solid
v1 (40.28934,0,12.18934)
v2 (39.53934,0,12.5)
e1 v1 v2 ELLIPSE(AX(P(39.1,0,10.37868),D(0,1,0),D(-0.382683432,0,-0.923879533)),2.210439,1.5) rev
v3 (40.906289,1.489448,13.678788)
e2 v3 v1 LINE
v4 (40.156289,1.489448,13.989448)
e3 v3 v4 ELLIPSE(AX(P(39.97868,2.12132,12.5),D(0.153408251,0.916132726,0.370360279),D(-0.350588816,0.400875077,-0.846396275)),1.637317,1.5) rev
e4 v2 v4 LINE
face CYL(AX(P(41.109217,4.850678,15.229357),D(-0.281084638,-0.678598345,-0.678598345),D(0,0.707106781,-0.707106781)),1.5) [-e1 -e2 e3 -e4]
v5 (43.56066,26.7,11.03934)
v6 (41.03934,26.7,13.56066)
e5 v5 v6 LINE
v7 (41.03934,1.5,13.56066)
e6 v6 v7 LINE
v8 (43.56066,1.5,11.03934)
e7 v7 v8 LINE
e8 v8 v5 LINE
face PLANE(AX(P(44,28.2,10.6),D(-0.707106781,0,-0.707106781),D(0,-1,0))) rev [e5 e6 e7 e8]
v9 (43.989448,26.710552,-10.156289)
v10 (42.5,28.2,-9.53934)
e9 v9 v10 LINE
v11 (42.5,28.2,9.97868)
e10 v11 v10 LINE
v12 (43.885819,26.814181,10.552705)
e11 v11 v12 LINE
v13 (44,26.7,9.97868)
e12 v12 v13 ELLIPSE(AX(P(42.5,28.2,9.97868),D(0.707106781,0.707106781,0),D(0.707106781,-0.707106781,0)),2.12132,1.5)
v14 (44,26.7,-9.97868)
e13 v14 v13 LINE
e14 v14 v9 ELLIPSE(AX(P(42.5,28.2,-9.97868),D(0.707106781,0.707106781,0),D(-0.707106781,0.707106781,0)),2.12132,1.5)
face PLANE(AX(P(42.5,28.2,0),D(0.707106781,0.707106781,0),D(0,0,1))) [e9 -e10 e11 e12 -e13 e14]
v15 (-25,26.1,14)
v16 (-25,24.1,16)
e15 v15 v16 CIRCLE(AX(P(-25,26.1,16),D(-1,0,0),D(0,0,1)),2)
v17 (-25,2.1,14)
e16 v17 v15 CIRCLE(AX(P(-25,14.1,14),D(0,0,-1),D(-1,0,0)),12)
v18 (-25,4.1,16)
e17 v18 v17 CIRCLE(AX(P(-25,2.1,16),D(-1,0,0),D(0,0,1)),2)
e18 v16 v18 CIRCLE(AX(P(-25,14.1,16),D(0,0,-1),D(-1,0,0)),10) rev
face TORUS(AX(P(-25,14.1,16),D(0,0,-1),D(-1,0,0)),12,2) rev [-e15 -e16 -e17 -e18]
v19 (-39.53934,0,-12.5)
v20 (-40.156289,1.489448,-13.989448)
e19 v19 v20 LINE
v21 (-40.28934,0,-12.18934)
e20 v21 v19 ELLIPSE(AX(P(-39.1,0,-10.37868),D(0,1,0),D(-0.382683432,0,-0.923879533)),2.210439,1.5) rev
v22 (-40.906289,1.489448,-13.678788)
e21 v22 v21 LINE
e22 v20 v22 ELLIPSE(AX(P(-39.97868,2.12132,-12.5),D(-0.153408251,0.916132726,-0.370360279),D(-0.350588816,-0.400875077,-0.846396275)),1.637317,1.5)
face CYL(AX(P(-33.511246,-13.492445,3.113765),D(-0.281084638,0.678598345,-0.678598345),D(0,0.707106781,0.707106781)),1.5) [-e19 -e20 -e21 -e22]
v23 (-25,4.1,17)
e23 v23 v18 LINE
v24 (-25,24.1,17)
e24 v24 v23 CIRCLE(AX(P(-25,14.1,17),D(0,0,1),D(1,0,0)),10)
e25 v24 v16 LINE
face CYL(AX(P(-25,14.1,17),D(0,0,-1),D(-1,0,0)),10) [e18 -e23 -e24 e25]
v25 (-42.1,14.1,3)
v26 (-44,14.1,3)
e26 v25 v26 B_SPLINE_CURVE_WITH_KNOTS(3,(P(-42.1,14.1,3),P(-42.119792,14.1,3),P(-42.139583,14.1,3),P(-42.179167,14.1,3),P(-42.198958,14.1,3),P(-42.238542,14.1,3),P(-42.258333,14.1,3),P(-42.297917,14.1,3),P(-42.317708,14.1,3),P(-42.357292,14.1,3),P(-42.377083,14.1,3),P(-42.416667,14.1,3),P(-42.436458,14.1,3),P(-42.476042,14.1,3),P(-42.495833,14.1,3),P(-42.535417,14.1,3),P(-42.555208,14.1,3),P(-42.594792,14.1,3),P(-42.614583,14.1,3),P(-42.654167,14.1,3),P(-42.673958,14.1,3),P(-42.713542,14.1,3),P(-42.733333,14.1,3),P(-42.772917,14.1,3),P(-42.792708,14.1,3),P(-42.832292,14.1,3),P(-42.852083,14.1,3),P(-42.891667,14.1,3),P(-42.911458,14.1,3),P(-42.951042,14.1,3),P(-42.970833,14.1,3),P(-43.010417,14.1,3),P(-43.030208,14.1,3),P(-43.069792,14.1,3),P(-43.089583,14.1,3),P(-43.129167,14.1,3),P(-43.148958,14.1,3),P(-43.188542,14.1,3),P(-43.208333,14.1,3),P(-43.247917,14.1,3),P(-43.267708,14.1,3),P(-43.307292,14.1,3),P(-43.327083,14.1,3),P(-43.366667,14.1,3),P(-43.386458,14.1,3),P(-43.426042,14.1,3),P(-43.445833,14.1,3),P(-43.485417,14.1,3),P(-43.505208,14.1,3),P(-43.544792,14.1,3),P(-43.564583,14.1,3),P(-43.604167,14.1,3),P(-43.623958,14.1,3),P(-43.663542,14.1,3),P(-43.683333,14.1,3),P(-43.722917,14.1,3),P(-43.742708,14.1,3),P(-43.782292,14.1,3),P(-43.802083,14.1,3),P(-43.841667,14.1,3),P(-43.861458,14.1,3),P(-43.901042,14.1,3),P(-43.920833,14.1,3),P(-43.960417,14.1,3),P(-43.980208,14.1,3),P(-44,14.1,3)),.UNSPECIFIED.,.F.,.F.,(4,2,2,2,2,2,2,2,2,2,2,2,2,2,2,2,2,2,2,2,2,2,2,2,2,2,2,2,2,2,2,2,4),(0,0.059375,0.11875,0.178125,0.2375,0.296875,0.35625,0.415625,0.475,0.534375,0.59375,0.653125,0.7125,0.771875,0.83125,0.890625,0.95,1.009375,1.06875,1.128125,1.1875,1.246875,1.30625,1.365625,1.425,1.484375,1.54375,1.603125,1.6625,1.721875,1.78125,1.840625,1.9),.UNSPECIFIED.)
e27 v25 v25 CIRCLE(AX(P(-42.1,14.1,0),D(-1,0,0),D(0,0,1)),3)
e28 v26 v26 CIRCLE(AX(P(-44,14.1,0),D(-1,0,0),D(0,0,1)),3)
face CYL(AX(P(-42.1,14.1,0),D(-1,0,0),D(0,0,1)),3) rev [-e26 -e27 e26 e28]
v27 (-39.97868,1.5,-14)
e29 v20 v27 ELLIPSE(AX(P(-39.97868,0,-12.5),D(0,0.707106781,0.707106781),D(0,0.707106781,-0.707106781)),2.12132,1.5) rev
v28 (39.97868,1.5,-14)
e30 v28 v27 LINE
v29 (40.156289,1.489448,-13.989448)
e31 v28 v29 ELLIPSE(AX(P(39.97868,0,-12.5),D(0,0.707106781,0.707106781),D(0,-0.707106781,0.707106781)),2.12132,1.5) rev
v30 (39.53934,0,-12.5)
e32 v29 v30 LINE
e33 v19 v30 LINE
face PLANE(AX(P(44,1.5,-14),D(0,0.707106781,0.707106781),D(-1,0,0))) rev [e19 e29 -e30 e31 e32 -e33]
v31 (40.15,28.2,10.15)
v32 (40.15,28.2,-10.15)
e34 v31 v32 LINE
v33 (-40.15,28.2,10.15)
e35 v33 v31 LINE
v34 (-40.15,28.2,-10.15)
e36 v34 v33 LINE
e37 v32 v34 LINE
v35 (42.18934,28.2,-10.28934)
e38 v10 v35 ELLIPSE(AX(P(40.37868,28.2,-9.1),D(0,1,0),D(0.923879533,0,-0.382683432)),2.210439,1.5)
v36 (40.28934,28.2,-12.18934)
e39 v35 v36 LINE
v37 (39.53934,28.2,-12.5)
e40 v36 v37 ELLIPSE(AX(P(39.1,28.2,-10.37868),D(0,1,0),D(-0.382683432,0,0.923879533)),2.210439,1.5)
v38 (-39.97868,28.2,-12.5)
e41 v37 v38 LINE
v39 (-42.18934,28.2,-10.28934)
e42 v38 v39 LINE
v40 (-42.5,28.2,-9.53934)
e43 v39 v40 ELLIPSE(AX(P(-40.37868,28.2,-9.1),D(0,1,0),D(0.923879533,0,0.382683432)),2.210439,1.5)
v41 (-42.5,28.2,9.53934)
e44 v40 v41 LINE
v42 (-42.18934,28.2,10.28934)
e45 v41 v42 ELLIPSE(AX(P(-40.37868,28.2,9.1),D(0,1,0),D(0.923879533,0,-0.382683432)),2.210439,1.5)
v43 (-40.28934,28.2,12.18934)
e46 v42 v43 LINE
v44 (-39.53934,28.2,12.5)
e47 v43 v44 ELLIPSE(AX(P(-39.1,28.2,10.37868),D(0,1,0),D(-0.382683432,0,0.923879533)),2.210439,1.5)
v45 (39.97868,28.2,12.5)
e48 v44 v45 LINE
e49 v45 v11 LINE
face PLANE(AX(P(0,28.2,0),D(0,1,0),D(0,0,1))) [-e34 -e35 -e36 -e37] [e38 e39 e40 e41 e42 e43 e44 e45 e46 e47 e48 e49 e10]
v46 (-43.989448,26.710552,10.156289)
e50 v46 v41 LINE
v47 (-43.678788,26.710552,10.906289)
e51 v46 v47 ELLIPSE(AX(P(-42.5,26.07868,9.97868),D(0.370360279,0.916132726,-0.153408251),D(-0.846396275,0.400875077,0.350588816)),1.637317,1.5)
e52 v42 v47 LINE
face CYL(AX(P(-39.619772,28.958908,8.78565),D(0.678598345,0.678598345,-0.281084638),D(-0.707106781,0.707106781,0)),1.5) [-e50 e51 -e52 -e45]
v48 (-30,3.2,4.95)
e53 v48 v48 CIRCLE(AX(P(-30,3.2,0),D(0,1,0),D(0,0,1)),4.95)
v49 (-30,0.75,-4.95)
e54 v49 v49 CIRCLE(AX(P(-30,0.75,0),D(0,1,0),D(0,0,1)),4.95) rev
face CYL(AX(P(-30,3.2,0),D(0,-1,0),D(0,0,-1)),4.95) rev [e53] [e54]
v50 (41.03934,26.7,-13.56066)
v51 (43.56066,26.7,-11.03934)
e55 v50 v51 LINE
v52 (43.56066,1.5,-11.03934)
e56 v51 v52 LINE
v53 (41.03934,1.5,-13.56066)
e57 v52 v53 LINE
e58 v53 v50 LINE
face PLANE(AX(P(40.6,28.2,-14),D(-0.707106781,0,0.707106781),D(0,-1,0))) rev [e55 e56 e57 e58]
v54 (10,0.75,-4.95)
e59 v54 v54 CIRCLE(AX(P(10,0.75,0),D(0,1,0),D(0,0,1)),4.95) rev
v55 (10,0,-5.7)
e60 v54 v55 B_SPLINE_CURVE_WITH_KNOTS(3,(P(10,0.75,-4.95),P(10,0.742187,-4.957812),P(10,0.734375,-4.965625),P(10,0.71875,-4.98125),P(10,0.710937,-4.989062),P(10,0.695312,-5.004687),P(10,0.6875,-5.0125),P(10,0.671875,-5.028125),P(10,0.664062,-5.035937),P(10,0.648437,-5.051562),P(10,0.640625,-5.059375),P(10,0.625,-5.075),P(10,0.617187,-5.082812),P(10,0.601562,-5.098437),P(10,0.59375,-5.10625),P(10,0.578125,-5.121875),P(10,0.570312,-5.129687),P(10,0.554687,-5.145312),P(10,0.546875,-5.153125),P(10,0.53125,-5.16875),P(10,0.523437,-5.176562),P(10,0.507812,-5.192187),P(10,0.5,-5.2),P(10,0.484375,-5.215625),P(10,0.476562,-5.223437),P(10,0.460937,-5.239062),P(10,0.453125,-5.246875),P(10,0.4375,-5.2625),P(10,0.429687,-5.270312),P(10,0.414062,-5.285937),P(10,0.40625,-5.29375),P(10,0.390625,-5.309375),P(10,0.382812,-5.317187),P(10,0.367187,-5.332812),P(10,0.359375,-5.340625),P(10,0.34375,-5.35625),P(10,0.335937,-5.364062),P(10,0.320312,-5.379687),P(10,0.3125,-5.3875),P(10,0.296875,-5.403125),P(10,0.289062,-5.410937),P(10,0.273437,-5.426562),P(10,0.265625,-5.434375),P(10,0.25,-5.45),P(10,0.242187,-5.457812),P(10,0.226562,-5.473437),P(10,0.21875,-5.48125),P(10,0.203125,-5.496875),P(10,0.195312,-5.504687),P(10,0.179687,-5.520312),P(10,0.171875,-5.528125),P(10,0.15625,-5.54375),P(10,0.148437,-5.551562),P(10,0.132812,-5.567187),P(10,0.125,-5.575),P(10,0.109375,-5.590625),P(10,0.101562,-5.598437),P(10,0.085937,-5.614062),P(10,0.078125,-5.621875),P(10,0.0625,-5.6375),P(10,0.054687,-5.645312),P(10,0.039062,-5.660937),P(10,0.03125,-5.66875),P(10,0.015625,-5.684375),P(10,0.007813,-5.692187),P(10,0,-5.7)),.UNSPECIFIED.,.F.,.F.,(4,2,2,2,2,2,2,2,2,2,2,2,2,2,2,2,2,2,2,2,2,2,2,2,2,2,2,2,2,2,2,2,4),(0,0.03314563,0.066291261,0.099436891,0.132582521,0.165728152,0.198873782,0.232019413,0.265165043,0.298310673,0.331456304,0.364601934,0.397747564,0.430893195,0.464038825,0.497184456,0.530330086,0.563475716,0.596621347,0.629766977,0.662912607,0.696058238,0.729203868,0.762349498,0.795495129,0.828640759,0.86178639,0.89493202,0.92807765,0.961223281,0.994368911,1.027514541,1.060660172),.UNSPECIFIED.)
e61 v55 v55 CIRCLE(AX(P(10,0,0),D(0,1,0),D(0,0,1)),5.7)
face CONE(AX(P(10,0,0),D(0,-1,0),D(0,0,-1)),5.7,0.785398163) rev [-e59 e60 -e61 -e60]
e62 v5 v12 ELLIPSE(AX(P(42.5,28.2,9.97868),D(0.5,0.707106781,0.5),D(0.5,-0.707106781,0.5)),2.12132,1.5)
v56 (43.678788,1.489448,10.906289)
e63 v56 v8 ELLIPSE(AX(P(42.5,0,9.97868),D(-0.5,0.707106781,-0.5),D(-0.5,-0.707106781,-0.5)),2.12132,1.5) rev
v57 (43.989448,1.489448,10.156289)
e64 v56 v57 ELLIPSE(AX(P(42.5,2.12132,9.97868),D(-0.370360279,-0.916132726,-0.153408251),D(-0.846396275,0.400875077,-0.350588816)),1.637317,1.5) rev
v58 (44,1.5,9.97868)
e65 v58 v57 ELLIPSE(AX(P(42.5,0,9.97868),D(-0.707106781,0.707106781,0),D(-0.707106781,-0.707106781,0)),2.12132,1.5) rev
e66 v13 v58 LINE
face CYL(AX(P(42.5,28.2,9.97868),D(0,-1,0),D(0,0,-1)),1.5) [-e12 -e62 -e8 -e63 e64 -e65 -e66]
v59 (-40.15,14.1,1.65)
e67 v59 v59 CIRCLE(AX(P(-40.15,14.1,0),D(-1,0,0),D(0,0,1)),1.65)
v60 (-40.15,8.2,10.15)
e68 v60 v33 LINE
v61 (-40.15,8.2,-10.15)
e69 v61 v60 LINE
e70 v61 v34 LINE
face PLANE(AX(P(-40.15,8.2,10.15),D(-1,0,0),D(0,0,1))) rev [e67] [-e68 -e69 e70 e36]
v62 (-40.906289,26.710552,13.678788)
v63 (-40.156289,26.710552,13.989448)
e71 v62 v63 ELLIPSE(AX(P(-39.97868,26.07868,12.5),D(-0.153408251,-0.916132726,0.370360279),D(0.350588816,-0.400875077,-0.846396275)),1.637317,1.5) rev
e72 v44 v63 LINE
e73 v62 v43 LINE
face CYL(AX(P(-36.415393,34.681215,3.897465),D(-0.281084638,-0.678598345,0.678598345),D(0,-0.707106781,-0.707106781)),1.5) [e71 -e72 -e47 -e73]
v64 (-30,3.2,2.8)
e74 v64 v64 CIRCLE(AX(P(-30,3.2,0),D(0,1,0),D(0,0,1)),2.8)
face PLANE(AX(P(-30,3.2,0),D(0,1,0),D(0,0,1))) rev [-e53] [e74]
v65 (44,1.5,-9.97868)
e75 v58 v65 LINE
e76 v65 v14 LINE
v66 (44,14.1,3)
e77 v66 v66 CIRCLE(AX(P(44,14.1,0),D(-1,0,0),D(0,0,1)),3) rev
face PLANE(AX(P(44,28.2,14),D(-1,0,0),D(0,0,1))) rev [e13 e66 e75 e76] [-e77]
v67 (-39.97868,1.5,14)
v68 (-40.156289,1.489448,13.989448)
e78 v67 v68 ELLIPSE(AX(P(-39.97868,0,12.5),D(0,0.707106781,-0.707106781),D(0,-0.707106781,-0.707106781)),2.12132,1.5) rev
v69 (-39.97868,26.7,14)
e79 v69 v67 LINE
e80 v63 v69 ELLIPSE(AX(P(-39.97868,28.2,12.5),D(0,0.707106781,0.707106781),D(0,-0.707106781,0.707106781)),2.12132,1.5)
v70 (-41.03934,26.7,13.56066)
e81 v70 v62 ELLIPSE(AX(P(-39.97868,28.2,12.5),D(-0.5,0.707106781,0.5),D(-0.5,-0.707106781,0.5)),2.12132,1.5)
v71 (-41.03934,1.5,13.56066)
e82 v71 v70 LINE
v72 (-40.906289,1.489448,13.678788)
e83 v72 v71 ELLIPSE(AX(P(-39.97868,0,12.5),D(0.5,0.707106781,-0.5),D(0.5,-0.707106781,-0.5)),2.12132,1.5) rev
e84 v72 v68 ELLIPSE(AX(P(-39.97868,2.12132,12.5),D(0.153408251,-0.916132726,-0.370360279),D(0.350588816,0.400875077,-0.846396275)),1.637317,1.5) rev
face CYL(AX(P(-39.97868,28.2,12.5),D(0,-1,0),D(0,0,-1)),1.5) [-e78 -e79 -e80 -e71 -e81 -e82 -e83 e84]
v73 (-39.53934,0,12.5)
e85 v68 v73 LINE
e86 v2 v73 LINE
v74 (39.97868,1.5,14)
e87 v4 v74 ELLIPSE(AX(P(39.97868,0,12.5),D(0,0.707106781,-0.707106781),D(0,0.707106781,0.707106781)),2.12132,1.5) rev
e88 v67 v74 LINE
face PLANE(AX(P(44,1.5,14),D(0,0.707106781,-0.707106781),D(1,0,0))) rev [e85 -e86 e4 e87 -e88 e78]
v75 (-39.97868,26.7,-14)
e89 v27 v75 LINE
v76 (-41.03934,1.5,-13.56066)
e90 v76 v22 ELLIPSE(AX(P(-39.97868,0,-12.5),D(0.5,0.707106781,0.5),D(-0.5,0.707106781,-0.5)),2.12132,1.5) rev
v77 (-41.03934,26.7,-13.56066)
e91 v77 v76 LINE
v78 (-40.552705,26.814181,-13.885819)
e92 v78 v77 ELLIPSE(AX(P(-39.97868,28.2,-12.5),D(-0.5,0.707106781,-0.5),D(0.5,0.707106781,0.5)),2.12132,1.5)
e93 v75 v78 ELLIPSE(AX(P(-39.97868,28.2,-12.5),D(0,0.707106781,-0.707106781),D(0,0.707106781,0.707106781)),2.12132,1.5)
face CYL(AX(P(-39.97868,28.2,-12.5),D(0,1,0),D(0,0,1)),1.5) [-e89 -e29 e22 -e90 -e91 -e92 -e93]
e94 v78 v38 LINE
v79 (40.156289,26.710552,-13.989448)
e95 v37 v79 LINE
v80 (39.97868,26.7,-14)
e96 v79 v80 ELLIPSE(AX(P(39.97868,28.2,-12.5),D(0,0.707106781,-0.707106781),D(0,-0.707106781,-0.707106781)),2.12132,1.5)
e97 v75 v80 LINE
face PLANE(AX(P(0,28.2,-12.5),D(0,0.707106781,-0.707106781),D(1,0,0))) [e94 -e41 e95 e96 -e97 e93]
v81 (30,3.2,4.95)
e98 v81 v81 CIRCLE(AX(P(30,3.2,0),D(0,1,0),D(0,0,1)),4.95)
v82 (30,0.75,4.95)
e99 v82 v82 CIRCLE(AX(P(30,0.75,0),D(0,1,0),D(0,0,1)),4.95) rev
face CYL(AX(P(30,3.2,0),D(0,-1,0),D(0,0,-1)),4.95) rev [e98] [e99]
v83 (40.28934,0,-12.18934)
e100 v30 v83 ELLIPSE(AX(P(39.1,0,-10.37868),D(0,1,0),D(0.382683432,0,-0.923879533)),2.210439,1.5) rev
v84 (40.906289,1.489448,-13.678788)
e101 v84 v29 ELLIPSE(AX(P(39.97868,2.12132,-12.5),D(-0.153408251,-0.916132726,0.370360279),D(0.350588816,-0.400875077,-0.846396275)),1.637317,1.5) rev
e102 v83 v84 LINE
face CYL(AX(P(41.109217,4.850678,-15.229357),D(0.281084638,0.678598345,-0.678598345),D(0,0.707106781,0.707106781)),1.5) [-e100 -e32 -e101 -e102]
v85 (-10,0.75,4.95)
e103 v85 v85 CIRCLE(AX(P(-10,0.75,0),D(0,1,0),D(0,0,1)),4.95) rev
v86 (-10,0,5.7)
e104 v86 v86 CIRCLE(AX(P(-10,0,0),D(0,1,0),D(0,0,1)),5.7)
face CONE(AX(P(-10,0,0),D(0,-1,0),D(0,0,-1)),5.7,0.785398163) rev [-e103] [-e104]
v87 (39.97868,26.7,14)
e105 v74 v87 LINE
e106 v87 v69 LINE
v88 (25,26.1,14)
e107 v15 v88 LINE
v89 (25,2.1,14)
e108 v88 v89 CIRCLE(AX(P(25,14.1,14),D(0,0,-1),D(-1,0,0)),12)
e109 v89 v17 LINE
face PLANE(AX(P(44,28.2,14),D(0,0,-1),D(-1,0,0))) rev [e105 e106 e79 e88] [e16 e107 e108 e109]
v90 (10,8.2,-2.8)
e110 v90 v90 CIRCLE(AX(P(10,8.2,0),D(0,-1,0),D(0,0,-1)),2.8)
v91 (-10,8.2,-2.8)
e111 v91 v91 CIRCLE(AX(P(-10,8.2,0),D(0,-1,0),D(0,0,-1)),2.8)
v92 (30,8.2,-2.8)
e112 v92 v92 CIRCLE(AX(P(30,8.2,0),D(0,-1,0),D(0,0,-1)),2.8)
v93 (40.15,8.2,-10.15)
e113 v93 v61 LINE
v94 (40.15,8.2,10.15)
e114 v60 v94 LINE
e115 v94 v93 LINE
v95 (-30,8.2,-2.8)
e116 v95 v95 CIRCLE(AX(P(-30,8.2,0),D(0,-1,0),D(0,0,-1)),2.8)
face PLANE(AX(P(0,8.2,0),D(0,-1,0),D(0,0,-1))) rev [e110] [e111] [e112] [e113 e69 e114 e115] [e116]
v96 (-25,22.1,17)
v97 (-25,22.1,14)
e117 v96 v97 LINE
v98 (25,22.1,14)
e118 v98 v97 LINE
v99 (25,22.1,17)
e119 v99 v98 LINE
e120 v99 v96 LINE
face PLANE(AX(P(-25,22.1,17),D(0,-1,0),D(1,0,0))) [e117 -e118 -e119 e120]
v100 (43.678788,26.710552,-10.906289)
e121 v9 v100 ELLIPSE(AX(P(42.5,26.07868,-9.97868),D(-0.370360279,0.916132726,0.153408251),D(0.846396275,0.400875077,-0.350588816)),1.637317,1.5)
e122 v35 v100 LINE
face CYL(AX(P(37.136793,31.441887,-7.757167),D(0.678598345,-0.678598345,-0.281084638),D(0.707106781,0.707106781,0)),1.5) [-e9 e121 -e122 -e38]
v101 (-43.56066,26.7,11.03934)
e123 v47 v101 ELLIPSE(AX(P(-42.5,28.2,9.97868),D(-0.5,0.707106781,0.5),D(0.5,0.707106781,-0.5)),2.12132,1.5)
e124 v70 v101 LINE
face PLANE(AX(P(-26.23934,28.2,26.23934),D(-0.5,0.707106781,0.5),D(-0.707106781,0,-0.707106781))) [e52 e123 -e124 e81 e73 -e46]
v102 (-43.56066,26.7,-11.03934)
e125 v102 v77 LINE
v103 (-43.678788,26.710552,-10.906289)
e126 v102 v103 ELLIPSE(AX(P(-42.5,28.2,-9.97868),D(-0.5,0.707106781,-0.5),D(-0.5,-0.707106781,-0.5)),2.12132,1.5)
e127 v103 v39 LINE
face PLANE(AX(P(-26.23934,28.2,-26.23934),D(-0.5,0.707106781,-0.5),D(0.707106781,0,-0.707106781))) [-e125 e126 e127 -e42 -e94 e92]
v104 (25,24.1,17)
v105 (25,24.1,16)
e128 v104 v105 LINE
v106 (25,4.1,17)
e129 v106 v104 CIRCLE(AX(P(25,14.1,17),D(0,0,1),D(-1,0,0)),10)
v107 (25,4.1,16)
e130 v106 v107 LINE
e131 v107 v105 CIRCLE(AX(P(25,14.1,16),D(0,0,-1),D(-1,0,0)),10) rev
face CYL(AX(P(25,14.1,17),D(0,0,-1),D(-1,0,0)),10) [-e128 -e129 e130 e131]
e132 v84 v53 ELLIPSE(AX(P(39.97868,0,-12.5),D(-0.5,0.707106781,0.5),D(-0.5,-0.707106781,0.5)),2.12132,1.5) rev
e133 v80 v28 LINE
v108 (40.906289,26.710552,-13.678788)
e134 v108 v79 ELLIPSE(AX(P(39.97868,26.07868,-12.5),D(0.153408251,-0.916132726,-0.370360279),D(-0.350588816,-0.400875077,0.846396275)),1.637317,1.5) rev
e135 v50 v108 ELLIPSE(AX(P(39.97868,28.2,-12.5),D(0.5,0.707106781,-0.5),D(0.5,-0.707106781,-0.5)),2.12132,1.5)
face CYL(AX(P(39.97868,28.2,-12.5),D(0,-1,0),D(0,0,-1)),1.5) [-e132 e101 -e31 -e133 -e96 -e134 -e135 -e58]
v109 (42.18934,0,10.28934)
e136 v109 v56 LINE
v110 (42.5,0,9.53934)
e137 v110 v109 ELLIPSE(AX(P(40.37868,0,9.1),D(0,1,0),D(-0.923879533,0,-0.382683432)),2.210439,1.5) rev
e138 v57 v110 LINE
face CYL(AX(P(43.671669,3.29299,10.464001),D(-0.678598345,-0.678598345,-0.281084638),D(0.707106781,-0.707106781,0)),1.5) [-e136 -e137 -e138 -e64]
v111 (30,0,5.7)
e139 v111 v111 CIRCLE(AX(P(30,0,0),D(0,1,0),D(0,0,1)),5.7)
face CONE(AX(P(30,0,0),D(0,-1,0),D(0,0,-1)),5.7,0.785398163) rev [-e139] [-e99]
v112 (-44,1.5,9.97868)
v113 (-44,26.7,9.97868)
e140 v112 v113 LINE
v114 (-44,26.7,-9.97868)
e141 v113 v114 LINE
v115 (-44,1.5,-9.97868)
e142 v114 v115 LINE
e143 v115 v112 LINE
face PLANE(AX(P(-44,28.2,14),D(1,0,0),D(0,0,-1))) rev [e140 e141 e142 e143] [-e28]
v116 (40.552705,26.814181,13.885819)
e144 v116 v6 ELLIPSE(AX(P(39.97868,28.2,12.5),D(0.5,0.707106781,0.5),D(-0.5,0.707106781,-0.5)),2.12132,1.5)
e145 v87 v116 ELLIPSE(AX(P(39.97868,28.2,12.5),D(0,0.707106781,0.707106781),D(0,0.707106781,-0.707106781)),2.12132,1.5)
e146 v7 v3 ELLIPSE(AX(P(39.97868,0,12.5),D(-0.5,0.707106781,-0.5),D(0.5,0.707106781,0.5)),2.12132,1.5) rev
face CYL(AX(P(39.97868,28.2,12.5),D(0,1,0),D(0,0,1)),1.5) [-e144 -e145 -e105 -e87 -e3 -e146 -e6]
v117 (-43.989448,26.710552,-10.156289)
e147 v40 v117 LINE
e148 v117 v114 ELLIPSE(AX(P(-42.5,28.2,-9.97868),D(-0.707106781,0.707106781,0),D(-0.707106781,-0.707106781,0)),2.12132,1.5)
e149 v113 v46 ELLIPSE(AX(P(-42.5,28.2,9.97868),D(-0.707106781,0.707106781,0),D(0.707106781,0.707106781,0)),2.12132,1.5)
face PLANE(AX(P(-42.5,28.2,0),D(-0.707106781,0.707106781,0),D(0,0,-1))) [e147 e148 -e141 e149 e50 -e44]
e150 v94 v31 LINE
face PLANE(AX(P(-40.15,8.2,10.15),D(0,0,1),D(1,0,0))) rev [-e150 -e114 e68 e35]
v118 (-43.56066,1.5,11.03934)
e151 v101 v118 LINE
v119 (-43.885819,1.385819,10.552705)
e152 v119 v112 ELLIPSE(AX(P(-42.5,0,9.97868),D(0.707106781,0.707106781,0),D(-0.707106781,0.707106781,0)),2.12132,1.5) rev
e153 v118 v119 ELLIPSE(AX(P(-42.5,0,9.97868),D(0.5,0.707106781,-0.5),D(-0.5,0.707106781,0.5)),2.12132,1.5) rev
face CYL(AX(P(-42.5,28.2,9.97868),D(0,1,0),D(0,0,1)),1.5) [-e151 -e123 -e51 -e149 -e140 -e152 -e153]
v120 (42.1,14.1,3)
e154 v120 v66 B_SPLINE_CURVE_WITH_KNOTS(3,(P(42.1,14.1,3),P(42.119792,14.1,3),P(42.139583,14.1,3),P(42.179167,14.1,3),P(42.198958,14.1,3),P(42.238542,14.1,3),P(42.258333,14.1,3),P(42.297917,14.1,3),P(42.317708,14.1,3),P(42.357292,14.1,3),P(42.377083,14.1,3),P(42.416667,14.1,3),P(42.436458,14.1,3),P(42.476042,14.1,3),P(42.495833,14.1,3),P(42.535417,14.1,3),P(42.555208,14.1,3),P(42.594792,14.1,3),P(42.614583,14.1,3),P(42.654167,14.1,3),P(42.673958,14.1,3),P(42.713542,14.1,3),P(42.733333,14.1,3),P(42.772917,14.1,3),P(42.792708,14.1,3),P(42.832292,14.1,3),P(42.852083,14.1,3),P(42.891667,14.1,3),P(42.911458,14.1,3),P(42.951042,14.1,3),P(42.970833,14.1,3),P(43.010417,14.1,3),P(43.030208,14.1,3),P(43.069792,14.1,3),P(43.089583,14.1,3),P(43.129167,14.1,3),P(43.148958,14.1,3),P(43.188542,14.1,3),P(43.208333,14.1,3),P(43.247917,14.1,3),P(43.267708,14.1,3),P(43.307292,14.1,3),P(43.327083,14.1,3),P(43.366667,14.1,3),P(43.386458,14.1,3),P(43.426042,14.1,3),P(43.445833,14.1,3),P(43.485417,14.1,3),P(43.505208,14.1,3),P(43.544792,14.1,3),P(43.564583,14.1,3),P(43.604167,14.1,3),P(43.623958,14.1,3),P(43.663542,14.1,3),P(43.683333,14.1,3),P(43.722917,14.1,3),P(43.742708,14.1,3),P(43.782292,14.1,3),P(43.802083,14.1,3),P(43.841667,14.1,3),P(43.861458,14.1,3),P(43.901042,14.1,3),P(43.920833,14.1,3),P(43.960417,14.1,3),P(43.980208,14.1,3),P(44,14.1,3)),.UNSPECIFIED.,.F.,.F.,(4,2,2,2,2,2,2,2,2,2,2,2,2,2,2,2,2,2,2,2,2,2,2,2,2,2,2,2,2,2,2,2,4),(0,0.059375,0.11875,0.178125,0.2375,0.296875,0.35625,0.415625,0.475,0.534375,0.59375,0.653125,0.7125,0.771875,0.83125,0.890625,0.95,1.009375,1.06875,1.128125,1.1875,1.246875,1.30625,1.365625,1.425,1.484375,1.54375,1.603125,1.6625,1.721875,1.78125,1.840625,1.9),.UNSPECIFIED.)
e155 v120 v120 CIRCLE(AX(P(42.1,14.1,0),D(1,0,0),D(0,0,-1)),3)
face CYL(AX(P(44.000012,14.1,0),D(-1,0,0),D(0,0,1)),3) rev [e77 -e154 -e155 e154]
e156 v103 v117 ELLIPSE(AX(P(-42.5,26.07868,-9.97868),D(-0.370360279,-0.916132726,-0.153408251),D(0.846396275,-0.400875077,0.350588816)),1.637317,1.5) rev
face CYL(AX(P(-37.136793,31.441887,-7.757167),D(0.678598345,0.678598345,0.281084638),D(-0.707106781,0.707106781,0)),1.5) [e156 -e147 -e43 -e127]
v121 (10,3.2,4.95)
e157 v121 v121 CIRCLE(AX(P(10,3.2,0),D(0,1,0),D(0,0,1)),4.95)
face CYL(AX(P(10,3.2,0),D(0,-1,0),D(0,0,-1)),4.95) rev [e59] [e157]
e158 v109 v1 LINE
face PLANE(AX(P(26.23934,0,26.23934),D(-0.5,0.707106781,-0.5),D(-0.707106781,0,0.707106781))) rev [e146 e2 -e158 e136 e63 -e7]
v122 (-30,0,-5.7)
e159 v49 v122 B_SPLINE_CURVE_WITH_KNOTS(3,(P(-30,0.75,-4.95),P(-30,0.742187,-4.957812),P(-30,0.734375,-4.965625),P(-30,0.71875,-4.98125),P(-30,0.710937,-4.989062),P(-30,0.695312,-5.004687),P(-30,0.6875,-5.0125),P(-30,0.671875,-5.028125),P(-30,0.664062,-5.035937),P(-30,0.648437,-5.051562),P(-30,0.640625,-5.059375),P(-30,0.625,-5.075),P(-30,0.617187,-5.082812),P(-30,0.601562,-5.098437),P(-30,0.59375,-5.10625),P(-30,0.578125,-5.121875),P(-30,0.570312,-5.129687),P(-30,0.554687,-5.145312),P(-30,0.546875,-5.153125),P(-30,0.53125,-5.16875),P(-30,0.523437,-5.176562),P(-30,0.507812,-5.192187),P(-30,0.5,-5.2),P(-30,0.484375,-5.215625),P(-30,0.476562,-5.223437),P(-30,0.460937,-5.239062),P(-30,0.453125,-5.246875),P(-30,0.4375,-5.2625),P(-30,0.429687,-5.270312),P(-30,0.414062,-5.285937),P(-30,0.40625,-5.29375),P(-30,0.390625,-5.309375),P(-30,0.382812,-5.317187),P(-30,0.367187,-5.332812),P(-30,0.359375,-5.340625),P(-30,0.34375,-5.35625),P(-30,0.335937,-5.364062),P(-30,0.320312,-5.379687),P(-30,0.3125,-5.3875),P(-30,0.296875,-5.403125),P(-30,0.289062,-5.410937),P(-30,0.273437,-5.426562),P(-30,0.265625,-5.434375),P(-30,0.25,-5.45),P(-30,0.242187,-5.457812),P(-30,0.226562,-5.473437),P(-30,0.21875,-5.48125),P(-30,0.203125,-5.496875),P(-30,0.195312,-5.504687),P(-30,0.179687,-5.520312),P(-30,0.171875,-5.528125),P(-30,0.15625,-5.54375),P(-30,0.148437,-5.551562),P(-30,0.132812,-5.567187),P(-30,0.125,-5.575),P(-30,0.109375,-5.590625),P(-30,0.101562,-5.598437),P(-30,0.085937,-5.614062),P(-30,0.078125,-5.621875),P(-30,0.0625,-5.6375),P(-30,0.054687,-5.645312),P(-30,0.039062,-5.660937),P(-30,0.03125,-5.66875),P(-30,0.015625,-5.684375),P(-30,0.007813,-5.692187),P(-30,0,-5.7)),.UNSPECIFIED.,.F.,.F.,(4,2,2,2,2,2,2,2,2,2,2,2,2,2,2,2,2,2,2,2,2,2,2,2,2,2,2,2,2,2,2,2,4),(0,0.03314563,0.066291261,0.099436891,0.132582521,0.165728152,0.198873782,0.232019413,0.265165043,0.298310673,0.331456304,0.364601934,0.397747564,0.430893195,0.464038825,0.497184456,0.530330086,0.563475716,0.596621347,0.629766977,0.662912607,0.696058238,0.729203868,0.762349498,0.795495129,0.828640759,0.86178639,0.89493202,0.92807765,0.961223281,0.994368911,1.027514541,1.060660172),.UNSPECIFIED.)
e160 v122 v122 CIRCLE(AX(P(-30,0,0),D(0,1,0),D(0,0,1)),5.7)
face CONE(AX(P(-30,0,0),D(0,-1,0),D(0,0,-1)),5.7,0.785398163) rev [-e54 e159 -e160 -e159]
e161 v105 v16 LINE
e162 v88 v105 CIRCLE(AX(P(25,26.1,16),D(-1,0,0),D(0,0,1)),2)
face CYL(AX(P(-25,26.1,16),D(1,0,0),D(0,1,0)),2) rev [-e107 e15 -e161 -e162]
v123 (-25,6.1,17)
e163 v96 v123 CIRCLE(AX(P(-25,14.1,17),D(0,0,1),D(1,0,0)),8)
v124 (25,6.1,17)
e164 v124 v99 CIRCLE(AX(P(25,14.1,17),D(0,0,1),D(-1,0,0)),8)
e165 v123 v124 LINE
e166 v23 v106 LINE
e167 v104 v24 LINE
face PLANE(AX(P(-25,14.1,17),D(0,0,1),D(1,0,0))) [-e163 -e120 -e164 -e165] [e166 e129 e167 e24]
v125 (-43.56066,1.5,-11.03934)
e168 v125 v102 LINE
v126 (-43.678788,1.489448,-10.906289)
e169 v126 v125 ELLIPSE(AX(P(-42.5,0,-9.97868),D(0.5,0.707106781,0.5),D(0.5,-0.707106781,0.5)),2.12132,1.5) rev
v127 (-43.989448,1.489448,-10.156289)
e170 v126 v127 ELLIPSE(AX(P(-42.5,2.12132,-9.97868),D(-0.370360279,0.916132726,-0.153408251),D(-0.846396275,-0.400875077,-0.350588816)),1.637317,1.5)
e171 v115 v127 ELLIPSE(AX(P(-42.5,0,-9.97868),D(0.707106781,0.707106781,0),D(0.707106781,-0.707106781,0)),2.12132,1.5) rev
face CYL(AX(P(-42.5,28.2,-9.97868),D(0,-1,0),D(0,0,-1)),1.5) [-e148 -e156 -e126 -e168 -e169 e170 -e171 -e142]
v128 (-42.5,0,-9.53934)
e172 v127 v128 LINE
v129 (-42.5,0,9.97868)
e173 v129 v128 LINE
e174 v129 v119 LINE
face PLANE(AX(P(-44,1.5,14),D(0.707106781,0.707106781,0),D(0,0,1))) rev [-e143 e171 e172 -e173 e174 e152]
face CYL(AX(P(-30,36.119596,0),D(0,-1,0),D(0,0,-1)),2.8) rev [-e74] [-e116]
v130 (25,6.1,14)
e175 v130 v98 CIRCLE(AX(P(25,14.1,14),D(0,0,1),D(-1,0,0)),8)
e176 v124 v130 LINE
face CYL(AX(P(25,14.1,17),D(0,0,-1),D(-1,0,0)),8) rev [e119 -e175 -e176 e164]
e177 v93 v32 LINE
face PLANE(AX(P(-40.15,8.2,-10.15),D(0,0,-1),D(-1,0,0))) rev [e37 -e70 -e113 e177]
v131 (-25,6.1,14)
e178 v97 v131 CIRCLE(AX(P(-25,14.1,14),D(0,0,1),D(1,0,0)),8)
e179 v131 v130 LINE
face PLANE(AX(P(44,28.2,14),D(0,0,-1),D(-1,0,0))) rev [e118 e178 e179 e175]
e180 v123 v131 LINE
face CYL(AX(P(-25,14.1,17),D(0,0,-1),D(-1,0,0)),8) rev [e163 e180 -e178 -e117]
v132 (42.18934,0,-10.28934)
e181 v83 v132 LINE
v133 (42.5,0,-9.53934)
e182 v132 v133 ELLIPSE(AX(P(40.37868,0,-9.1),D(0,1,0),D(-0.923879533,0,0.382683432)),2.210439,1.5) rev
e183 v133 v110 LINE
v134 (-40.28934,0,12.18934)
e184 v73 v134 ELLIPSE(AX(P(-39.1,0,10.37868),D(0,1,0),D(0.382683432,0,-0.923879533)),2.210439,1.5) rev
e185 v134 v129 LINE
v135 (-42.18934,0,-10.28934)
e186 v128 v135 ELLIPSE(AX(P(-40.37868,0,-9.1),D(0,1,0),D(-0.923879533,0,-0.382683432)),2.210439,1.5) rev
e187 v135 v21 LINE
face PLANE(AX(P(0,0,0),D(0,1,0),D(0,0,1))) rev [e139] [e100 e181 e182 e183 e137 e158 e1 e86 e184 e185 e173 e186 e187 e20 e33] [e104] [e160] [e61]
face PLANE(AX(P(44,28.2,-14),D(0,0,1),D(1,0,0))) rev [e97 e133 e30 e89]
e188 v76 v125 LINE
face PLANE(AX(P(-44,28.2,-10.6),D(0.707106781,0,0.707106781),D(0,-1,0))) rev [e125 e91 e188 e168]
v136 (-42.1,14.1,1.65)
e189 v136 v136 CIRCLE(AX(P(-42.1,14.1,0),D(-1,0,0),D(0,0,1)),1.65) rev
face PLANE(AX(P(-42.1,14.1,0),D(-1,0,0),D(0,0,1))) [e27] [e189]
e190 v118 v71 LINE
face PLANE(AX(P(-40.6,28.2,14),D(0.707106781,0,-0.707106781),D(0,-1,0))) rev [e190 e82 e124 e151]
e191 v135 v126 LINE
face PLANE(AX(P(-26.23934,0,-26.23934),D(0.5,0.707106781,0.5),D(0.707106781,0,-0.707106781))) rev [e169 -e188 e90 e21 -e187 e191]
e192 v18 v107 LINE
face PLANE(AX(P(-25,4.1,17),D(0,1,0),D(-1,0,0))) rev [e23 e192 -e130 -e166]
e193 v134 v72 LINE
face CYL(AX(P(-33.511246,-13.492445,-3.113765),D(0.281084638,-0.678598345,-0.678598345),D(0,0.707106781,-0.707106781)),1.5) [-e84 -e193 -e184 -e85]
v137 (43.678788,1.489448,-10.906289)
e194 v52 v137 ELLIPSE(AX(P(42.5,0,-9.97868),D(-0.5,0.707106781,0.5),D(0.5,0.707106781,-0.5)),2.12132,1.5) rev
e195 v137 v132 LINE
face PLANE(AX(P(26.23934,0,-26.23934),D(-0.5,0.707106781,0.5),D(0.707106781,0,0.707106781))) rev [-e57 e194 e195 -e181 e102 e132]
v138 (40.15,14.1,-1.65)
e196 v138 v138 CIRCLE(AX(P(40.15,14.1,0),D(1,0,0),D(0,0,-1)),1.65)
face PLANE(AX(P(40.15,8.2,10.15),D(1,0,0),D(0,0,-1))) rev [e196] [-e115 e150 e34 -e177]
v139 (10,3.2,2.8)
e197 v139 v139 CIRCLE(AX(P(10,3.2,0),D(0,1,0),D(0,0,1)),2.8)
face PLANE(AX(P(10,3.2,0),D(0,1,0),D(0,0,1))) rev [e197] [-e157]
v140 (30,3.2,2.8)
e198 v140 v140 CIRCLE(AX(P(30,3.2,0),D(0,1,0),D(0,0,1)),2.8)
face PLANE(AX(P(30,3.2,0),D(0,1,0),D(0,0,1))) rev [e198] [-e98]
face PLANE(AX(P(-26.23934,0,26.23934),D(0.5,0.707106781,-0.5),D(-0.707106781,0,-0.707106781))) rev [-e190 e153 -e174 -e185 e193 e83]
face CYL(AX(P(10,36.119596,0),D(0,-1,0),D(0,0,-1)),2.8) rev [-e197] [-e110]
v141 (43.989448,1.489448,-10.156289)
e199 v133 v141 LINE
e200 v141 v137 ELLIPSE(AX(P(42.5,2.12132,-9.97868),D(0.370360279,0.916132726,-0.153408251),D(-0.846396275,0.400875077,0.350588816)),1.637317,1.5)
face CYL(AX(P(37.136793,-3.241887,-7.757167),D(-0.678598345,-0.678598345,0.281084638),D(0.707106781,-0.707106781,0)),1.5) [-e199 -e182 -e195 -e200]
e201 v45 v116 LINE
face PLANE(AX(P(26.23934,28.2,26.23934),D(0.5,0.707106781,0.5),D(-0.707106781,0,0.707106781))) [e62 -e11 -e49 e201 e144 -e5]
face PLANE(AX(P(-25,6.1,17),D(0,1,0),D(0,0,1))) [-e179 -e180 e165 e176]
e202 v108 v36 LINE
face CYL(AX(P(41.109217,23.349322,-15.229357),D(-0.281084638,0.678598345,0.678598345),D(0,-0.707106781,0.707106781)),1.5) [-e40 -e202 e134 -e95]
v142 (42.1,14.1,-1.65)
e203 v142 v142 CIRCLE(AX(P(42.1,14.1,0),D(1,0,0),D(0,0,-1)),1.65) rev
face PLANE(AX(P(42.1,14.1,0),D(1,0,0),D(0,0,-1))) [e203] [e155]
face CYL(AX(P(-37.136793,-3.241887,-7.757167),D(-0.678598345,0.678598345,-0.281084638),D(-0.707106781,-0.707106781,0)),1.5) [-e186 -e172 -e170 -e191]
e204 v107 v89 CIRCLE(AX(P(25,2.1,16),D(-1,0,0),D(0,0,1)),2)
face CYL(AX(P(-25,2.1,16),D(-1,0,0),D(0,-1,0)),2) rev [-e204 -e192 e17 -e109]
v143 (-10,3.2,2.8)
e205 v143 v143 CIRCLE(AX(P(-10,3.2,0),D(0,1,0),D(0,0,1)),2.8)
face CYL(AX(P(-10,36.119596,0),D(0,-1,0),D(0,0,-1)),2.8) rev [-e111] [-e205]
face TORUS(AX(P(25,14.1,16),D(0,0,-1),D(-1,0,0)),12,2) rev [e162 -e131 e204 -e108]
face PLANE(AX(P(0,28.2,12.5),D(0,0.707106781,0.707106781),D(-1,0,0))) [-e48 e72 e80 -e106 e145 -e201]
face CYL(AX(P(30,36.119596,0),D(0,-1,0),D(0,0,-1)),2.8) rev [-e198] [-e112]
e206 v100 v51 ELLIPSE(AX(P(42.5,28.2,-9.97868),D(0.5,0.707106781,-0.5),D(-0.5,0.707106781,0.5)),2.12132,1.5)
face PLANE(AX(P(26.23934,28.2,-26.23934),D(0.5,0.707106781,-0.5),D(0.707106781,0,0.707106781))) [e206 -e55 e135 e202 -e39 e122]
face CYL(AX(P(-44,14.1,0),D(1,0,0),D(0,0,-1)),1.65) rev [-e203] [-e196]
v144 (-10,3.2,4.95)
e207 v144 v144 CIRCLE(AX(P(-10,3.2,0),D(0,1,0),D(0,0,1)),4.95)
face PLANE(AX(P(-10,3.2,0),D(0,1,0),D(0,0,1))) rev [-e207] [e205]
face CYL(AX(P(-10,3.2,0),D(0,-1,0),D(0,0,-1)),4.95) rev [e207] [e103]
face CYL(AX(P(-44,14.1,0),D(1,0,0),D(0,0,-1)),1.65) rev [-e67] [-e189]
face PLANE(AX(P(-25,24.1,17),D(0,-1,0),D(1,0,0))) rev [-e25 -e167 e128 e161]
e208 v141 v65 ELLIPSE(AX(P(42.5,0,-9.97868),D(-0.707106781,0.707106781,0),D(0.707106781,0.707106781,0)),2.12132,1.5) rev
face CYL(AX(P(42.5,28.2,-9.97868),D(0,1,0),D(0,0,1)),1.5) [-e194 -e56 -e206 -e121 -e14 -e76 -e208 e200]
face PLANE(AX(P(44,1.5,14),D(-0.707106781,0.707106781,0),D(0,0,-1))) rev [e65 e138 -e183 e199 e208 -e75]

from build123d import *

# Parameters (mm, degrees)
SKETCH1_W               = 88
SKETCH1_H               = 28
BOSS_EXTRUDE1_DEPTH     = 28.2
SKETCH4_R               = 2.8
CUT_EXTRUDE1_DEPTH      = 28.2
SKETCH6_R               = 4.95
CUT_EXTRUDE2_DEPTH      = 3.2
SKETCH7_W               = 80.3
SKETCH7_H               = 20.3
CUT_EXTRUDE3_DEPTH      = 20
BOSS_EXTRUDE2_DEPTH     = 3
CHAMFER2_SIZE           = 3.4
FILLET1_R               = 2
CHAMFER3_SIZE           = 1.5
FILLET3_R               = 1.5
CHAMFER4_SIZE           = 0.75
CUT_EXTRUDE6_DEPTH      = 94.958714338
CUT_EXTRUDE6_DEPTH_BACK = 94.958714338
SKETCH11_R              = 1.65
CUT_EXTRUDE8_DEPTH      = 94.958714338
CUT_EXTRUDE8_DEPTH_BACK = 1.9
SKETCH14_R              = 3
CUT_EXTRUDE9_START      = -1.9
SKETCH15_R              = 3
CUT_EXTRUDE9_DEPTH      = 1.9


with BuildPart() as part:
    # Sketch1 → Boss-Extrude1 (new body)
    with BuildSketch(Plane(origin=(0, 0, 0), x_dir=(1, 0, 0), z_dir=(0, 1, 0))):
        Rectangle(SKETCH1_W, SKETCH1_H)
    extrude(amount=BOSS_EXTRUDE1_DEPTH)

    # Sketch4 → Cut-Extrude1 (cut)
    with BuildSketch(Plane(origin=(0, 0, 0), x_dir=(1, 0, 0), z_dir=(0, 1, 0))):
        with Locations(Location((30, 0, 0), (0, 0, 270))):
            Circle(SKETCH4_R)
        with Locations(Location((10, 0, 0), (0, 0, 270))):
            Circle(SKETCH4_R)
        with Locations(Location((-10, 0, 0), (0, 0, 270))):
            Circle(SKETCH4_R)
        with Locations(Location((-30, 0, 0), (0, 0, 270))):
            Circle(SKETCH4_R)
    extrude(amount=CUT_EXTRUDE1_DEPTH, mode=Mode.SUBTRACT)

    # Sketch6 → Cut-Extrude2 (cut)
    with BuildSketch(Plane(origin=(0, 0, 0), x_dir=(1, 0, 0), z_dir=(0, 1, 0))):
        with Locations(Location((30, 0, 0), (0, 0, 270))):
            Circle(SKETCH6_R)
        with Locations(Location((10, 0, 0), (0, 0, 270))):
            Circle(SKETCH6_R)
        with Locations(Location((-10, 0, 0), (0, 0, 270))):
            Circle(SKETCH6_R)
        with Locations(Location((-30, 0, 0), (0, 0, 270))):
            Circle(SKETCH6_R)
    extrude(amount=CUT_EXTRUDE2_DEPTH, mode=Mode.SUBTRACT)

    # Sketch7 → Cut-Extrude3 (cut)
    with BuildSketch(Plane(origin=(0, 28.2, 0), x_dir=(1, 0, 0), z_dir=(0, 1, 0))):
        Rectangle(SKETCH7_W, SKETCH7_H)
    extrude(amount=-CUT_EXTRUDE3_DEPTH, mode=Mode.SUBTRACT)

    # Sketch8 → Boss-Extrude2 (add)
    with BuildSketch(Plane.XY.offset(14)):
        with BuildLine():
            Line((-25, 24.1), (25, 24.1))
            ThreePointArc((25, 24.1), (35, 14.1), (25, 4.1))
            Line((25, 4.1), (-25, 4.1))
            ThreePointArc((-25, 4.1), (-35, 14.1), (-25, 24.1))
        make_face()
        with BuildLine():
            Line((-25, 6.1), (25, 6.1))
            ThreePointArc((25, 6.1), (33, 14.1), (25, 22.1))
            Line((25, 22.1), (-25, 22.1))
            ThreePointArc((-25, 22.1), (-33, 14.1), (-25, 6.1))
        make_face(mode=Mode.SUBTRACT)
    extrude(amount=BOSS_EXTRUDE2_DEPTH)

    # Chamfer2
    chamfer2_edges = [part.edges().sort_by_distance(p)[0] for p in [
        (-44, 14.1, -14),
        (44, 14.1, -14),
        (44, 14.1, 14),
        (-44, 14.1, 14),
    ]]
    chamfer(chamfer2_edges, length=CHAMFER2_SIZE)

    # Fillet1
    fillet1_edges = [part.edges().sort_by_distance(p)[0] for p in [
        (-35, 14.1, 14),
        (0, 4.1, 14),
        (35, 14.1, 14),
        (0, 24.1, 14),
    ]]
    fillet(fillet1_edges, radius=FILLET1_R)

    # Chamfer3
    chamfer3_edges = [part.edges().sort_by_distance(p)[0] for p in [
        (0, 0, 14),
        (0, 28.2, 14),
        (-44, 0, 0),
        (0, 0, -14),
        (44, 0, 0),
        (-42.3, 0, -12.3),
        (42.3, 0, -12.3),
        (42.3, 0, 12.3),
        (-42.3, 0, 12.3),
        (-44, 28.2, 0),
        (44, 28.2, 0),
        (0, 28.2, -14),
        (-42.3, 28.2, -12.3),
        (42.3, 28.2, -12.3),
        (42.3, 28.2, 12.3),
        (-42.3, 28.2, 12.3),
    ]]
    chamfer(chamfer3_edges, length=CHAMFER3_SIZE)

    # Fillet3
    # the kernel refuses this fillet: 1.5 mm, written as the material it takes off along each edge
    with BuildSketch(Plane(origin=(44, -0.053300859, -10.6), x_dir=(0, 0, 1), z_dir=(0, 1, 0)), Plane(origin=(40.6, -0.053300859, -14), x_dir=(0.7071067811865476, 0, 0.7071067811865476), z_dir=(0, 1, 0)), Plane(origin=(44, -0.053300859, 10.6), x_dir=(-0.707106781186546, 0, 0.7071067811865489), z_dir=(0, 1, 0)), Plane(origin=(40.6, -0.053300859, 14), x_dir=(-1, 0, 0), z_dir=(0, 1, 0))) as fillet3_piece_1:
        with BuildLine():
            CenterArc((FILLET3_R * 0.414213562373, -FILLET3_R), FILLET3_R, 90, 45)
            Line((-FILLET3_R * 0.292893218813, -FILLET3_R * 0.292893218813), (0, 0))
            Line((0, 0), (FILLET3_R * 0.414213562373, 0))
        make_face()
    extrude(amount=28.306601718, mode=Mode.SUBTRACT)
    with BuildSketch(Plane(origin=(-40.6, -0.053300859, 14), x_dir=(1, 0, 0), z_dir=(0, 1, 0)), Plane(origin=(-44, -0.053300859, 10.6), x_dir=(0.7071067811865476, 0, 0.7071067811865476), z_dir=(0, 1, 0)), Plane(origin=(-44, -0.053300859, -10.6), x_dir=(0, 0, 1), z_dir=(0, 1, 0)), Plane(origin=(-40.6, -0.053300859, -14), x_dir=(-0.7071067811865476, 0, 0.7071067811865476), z_dir=(0, 1, 0))) as fillet3_piece_2:
        with BuildLine():
            CenterArc((FILLET3_R * 0.414213562373, FILLET3_R), FILLET3_R, 225, 45)
            Line((-FILLET3_R * 0.292893218813, FILLET3_R * 0.292893218813), (0, 0))
            Line((0, 0), (FILLET3_R * 0.414213562373, 0))
        make_face()
    extrude(amount=28.306601718, mode=Mode.SUBTRACT)
    with BuildSketch(Plane(origin=(-40.896282151, 25.984711613, 14.715288387), x_dir=(0.9596829822606673, -0.19875685341551574, 0.19875685341551153), z_dir=(0.2810846377148206, 0.678598344545847, -0.678598344545847)), Plane(origin=(41.784711613, 28.915288387, -9.682397506), x_dir=(0.19875685341552204, -0.1987568534155052, 0.9596829822606672), z_dir=(0.678598344545847, -0.678598344545847, -0.2810846377148206)), Plane(origin=(39.682397506, 28.915288387, -11.784711613), x_dir=(0.8191406634032525, -0.19875685341551952, 0.5380560256884418), z_dir=(0.2810846377148208, -0.678598344545847, -0.678598344545847)), Plane(origin=(-41.784711613, -0.715288387, -9.682397506), x_dir=(-0.1987568534155126, 0.19875685341551472, 0.9596829822606672), z_dir=(-0.678598344545847, 0.678598344545847, -0.2810846377148206)), Plane(origin=(40.896282151, 2.215288387, 14.715288387), x_dir=(-0.9596829822606671, 0.1987568534155152, 0.19875685341551202), z_dir=(-0.2810846377148206, -0.678598344545847, -0.678598344545847)), Plane(origin=(-39.682397506, -0.715288387, -11.784711613), x_dir=(-0.8191406634032554, 0.19875685341551527, 0.5380560256884387), z_dir=(-0.2810846377148208, 0.678598344545847, -0.678598344545847))) as fillet3_piece_3:
        with BuildLine():
            CenterArc((FILLET3_R * 0.281084637715, FILLET3_R), FILLET3_R, 238.60028519, 31.39971481)
            Line((-FILLET3_R * 0.239920745565, FILLET3_R * 0.146446609407), (0, 0))
            Line((0, 0), (FILLET3_R * 0.281084637715, 0))
        make_face()
    extrude(amount=4.31857342, mode=Mode.SUBTRACT)
    with BuildSketch(Plane(origin=(-41.784711613, 28.915288387, 9.682397506), x_dir=(0.5380560256884337, -0.19875685341550817, 0.8191406634032606), z_dir=(-0.678598344545847, -0.678598344545847, 0.2810846377148207)), Plane(origin=(-41.784711613, 28.915288387, -9.682397506), x_dir=(-0.1987568534155052, -0.19875685341552204, 0.9596829822606672), z_dir=(-0.678598344545847, -0.678598344545847, -0.2810846377148206)), Plane(origin=(-40.896282151, 2.215288387, 14.715288387), x_dir=(0.9596829822606672, 0.1987568534155143, 0.19875685341551325), z_dir=(0.2810846377148208, -0.678598344545847, -0.678598344545847)), Plane(origin=(41.784711613, -0.715288387, 9.682397506), x_dir=(-0.5380560256884355, 0.19875685341551075, 0.8191406634032589), z_dir=(0.678598344545847, 0.678598344545847, 0.2810846377148207)), Plane(origin=(39.682397506, -0.715288387, -11.784711613), x_dir=(0.819140663403258, 0.1987568534155118, 0.5380560256884362), z_dir=(0.2810846377148208, 0.678598344545847, -0.678598344545847)), Plane(origin=(41.784711613, -0.715288387, -9.682397506), x_dir=(0.1987568534155142, 0.19875685341551314, 0.9596829822606673), z_dir=(0.678598344545847, 0.678598344545847, -0.2810846377148206))) as fillet3_piece_4:
        with BuildLine():
            CenterArc((FILLET3_R * 0.281084637715, -FILLET3_R), FILLET3_R, 90, 31.39971481)
            Line((-FILLET3_R * 0.239920745565, -FILLET3_R * 0.146446609407), (0, 0))
            Line((0, 0), (FILLET3_R * 0.281084637715, 0))
        make_face()
    extrude(amount=4.31857342, mode=Mode.SUBTRACT)

    # Chamfer4
    chamfer4_edges = [part.edges().sort_by_distance(p)[0] for p in [
        (30, 0, -4.95),
        (10, 0, -4.95),
        (-10, 0, -4.95),
        (-30, 0, -4.95),
    ]]
    chamfer(chamfer4_edges, length=CHAMFER4_SIZE)

    # Sketch11 → Cut-Extrude6 (cut, two sides: drawn at the far end of the back side and taken through both)
    with BuildSketch(Plane(origin=(44, 0, 0), x_dir=(0, 0, -1), z_dir=(1, 0, 0)).offset(-CUT_EXTRUDE6_DEPTH_BACK)):
        with Locations((0, 14.1)):
            Circle(SKETCH11_R)
    extrude(amount=CUT_EXTRUDE6_DEPTH + CUT_EXTRUDE6_DEPTH_BACK, mode=Mode.SUBTRACT)

    # Sketch14 → Cut-Extrude8 (cut, two sides: drawn at the far end of the back side and taken through both)
    with BuildSketch(Plane(origin=(44, 0, 0), x_dir=(0, 0, -1), z_dir=(1, 0, 0)).offset(-CUT_EXTRUDE8_DEPTH_BACK)):
        with Locations(Location((0, 14.1, 0), (0, 0, 180))):
            Circle(SKETCH14_R)
    extrude(amount=CUT_EXTRUDE8_DEPTH + CUT_EXTRUDE8_DEPTH_BACK, mode=Mode.SUBTRACT)

    # Sketch15 → Cut-Extrude9 (cut)
    with BuildSketch(Plane.ZY.offset(44).offset(CUT_EXTRUDE9_START)):
        with Locations((0, 14.1)):
            Circle(SKETCH15_R)
    extrude(amount=CUT_EXTRUDE9_DEPTH, mode=Mode.SUBTRACT)


solid = part.part
